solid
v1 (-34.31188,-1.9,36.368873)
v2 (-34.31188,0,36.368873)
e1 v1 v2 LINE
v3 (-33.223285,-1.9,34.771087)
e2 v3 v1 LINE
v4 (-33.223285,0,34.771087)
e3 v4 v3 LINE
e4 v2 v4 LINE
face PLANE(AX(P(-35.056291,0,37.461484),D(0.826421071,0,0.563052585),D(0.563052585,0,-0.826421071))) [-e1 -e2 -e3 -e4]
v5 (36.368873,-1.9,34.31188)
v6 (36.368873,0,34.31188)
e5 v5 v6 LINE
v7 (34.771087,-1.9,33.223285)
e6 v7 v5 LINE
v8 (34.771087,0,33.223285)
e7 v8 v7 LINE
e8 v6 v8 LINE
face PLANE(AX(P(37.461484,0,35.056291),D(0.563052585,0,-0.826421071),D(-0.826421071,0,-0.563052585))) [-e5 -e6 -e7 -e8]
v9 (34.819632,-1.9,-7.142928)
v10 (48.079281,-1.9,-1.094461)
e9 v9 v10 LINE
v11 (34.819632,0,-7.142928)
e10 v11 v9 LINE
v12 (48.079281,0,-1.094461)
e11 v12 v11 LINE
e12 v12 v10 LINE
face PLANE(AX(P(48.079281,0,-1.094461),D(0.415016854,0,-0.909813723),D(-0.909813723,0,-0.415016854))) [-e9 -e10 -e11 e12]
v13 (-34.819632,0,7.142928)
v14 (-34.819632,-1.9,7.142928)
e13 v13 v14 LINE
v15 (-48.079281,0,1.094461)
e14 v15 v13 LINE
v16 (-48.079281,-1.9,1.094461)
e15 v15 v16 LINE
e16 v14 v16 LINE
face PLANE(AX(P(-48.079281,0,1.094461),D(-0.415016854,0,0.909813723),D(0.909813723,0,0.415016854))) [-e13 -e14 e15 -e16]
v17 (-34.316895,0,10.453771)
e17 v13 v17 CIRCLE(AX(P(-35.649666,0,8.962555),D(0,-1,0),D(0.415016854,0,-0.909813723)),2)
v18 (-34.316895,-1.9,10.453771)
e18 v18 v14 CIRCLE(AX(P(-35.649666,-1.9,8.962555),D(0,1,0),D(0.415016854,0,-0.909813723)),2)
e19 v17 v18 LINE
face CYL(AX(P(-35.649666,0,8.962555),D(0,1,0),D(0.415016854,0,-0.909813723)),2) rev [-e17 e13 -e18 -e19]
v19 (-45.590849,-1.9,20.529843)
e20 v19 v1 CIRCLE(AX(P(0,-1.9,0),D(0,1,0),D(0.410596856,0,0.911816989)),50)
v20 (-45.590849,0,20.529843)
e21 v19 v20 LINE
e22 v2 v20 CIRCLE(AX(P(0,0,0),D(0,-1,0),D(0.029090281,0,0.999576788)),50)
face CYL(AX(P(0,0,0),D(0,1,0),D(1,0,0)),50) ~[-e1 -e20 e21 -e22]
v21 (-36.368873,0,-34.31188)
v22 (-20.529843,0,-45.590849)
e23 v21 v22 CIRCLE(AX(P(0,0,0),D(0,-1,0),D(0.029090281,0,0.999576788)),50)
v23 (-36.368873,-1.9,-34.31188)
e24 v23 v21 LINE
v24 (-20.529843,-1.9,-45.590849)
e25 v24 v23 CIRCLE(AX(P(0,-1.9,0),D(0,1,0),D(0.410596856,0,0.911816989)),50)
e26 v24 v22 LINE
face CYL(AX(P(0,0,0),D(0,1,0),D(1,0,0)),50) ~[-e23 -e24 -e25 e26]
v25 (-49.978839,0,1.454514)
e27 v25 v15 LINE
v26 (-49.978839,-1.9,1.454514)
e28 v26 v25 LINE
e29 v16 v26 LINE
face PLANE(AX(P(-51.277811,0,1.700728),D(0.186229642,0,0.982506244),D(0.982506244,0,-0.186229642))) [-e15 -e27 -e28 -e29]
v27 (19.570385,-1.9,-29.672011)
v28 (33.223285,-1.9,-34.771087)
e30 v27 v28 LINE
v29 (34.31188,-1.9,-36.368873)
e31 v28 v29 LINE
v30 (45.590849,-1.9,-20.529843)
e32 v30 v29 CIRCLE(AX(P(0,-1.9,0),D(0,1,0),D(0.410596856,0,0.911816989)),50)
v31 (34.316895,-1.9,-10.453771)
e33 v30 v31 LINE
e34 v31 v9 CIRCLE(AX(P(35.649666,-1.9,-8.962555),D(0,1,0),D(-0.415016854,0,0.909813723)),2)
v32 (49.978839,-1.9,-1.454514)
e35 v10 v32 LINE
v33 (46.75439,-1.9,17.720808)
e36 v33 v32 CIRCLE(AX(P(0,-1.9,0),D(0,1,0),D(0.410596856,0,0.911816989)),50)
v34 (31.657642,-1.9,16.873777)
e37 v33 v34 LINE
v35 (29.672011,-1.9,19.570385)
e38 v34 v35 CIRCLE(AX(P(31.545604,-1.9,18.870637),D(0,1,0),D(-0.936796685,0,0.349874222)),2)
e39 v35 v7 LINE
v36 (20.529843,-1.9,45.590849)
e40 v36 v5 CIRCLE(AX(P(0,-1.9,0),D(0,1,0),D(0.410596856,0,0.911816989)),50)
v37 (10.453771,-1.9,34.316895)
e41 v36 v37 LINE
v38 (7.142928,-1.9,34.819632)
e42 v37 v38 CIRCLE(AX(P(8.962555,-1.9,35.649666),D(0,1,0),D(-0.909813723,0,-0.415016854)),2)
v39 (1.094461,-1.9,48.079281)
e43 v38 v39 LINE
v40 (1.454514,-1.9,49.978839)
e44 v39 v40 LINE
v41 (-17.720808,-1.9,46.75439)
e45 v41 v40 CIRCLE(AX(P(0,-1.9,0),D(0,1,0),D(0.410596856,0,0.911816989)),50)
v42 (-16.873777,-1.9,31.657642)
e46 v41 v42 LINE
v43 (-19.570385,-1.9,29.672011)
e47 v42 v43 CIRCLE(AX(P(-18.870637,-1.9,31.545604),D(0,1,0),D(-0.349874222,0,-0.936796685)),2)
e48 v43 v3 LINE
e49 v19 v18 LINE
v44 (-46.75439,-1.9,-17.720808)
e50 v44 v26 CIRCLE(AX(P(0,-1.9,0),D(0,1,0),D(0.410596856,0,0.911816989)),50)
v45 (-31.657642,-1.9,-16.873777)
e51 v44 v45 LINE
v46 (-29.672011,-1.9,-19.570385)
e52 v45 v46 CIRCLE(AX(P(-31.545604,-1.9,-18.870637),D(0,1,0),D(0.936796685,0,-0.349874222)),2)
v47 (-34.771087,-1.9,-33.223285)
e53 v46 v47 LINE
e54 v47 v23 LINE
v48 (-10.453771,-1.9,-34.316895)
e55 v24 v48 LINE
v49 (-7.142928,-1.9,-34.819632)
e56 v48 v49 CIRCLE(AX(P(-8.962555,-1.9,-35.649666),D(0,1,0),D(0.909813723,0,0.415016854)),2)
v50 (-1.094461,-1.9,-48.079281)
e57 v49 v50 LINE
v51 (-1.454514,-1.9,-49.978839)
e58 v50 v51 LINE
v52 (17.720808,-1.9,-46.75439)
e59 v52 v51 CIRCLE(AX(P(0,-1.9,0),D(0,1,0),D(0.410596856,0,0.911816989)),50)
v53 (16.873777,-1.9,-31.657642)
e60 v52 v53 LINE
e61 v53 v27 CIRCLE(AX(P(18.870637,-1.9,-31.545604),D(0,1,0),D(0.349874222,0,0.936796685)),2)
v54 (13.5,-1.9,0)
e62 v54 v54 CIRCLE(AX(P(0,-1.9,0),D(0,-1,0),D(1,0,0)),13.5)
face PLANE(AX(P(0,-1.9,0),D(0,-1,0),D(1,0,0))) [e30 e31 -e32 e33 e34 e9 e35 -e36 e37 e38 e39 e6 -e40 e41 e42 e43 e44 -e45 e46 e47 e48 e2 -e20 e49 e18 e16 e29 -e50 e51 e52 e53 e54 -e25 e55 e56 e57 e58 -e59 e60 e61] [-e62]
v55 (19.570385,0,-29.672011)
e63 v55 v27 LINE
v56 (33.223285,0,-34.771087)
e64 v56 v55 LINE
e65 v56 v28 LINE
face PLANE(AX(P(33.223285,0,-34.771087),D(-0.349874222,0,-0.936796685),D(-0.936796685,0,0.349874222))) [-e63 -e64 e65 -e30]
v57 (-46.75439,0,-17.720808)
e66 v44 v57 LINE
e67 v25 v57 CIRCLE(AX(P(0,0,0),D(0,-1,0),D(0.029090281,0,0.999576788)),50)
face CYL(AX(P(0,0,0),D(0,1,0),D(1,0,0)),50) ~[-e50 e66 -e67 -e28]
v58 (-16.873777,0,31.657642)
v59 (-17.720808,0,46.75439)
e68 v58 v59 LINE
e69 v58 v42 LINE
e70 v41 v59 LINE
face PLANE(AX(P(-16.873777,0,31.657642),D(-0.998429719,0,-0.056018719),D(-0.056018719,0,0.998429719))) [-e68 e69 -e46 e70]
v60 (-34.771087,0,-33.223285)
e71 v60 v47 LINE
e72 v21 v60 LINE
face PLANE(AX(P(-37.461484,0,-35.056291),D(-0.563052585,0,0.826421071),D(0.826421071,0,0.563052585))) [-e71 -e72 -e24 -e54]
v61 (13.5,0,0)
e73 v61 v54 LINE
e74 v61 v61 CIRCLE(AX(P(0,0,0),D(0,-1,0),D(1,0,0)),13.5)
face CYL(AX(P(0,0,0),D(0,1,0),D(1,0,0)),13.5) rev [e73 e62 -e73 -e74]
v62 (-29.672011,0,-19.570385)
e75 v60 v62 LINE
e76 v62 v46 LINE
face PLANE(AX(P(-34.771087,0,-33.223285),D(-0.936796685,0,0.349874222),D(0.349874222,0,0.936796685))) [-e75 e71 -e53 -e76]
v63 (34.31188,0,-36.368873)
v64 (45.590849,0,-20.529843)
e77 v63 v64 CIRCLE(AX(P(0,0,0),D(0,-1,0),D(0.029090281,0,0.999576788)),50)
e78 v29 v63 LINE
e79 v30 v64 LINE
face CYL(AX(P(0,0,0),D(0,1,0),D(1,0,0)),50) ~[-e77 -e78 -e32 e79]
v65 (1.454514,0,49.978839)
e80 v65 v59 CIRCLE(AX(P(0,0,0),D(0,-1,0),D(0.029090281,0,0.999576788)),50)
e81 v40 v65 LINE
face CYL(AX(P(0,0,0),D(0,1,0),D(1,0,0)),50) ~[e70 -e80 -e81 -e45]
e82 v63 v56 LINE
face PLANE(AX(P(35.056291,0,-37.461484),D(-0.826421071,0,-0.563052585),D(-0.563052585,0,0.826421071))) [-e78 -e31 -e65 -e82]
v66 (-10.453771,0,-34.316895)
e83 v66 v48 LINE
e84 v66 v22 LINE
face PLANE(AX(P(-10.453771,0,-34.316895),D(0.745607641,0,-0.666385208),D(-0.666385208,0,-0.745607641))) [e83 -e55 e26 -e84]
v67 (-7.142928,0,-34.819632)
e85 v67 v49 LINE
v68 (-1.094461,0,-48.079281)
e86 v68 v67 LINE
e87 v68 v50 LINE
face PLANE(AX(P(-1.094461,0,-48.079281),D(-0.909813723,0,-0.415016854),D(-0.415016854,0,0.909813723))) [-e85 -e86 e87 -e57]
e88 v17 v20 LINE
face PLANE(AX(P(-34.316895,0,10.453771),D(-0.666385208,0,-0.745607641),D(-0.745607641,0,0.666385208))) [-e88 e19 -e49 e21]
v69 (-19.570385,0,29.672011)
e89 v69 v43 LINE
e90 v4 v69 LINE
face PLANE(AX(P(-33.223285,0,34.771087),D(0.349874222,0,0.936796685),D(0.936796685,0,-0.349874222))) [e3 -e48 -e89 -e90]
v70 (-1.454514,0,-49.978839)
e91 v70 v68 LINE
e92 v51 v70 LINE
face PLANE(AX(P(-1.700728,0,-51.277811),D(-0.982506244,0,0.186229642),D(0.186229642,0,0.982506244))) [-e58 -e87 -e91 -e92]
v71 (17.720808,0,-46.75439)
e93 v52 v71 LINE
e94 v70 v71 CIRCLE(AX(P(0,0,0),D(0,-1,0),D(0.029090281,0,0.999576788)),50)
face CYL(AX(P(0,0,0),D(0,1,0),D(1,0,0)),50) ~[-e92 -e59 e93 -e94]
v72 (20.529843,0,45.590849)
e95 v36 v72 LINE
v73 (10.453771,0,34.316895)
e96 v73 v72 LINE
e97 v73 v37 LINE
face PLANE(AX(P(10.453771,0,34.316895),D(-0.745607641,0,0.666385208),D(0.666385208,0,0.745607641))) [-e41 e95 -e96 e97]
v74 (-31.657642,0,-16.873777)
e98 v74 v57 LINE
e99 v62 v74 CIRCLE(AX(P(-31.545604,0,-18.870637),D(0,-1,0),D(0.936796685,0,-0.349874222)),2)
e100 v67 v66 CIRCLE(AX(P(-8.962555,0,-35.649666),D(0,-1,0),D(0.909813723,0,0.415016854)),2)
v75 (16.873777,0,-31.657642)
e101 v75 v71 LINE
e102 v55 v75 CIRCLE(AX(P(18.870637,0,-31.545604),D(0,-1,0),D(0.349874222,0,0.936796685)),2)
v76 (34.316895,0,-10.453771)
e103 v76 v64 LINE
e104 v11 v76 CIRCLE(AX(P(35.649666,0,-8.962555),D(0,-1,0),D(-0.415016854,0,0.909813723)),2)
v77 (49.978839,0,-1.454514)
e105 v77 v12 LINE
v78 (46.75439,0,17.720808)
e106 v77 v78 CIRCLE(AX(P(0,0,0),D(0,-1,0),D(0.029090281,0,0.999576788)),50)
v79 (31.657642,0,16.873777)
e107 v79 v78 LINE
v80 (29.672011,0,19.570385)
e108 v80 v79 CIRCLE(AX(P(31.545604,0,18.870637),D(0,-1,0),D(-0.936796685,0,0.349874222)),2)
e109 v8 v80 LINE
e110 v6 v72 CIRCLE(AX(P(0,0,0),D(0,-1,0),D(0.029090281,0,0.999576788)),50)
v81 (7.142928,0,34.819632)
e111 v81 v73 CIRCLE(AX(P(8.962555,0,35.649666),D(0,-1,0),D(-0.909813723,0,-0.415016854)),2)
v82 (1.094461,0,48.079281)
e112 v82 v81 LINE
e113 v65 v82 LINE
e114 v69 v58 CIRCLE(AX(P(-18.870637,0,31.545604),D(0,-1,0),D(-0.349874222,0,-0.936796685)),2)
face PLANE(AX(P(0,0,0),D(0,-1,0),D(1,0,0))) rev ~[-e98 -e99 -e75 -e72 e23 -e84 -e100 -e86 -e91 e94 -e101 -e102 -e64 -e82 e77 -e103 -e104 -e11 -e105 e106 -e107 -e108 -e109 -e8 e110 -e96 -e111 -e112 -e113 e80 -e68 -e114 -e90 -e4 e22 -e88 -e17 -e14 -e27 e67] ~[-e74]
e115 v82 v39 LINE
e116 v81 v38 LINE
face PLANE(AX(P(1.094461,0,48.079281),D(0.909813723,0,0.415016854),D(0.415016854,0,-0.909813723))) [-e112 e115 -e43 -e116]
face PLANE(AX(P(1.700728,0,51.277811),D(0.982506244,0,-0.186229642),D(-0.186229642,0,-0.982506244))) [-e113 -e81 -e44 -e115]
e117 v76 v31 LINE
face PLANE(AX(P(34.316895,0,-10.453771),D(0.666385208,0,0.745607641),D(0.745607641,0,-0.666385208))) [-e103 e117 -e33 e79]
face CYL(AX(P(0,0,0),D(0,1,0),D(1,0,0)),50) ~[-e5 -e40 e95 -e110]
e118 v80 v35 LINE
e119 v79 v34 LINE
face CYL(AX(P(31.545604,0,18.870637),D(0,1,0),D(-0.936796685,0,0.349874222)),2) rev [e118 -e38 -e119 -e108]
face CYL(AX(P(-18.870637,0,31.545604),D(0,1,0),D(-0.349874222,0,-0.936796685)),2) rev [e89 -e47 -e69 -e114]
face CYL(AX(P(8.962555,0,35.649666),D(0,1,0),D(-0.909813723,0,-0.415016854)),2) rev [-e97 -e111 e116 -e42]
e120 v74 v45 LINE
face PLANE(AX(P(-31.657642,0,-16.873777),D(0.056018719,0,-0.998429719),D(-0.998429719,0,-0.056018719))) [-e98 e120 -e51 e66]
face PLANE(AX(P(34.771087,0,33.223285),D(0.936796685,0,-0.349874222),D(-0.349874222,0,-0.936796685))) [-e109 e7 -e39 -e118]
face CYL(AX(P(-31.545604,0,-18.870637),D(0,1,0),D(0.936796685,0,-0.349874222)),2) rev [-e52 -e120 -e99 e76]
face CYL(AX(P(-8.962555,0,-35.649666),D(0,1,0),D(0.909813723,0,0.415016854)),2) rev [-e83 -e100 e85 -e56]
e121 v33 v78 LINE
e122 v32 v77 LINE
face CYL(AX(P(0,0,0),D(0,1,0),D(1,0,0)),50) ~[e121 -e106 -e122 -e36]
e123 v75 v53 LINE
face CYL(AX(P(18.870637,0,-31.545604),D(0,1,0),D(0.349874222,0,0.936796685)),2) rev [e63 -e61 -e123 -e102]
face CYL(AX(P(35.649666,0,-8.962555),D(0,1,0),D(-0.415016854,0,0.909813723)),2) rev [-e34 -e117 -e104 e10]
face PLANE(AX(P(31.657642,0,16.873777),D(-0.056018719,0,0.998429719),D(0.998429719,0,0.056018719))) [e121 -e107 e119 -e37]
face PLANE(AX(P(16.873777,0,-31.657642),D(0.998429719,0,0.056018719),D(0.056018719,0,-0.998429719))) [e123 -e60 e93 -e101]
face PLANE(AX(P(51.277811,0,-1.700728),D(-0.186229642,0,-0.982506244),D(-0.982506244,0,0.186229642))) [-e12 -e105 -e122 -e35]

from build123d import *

# Parameters (mm, degrees)
F0_R            = 50
F0_R_2          = 13.5
F1_DEPTH        = 1.9
F3_DEPTH        = 25
F5_DEPTH        = 25
F5_COPIES_COUNT = 8


# Not quite as in the source:
# - a pattern or mirror of a feature is missing from the dataset's text; its kind, count and spacing are read off the source's solid


with BuildPart() as f1:
    # F0 (on Front) → F1 (new body)
    with BuildSketch(Plane.XZ):
        Circle(F0_R)
        Circle(F0_R_2, mode=Mode.SUBTRACT)
    extrude(amount=F1_DEPTH)

    # F2 (on Front) → F3 (cut)
    with BuildSketch(Plane.XZ):
        with BuildLine():
            Line((12.4794095755, 60.955286026), (0, 50.1961745322))
            Line((0, 50.1961745322), (2.7271706326, 35.8238514012))
            ThreePointArc((2.7271706326, 35.8238514012), (3.9364062163, 34.3449689954), (5.8350966322, 34.555488762))
            Line((5.8350966322, 34.555488762), (21.0234094411, 45.1330654323))
            Line((21.0234094411, 45.1330654323), (12.4794095755, 60.955286026))
        make_face()
    extrude(amount=-F3_DEPTH, mode=Mode.SUBTRACT)

    # F4 (on Front) → F5 (cut)
    with BuildSketch(Plane.XZ):
        with BuildLine():
            Line((10.4537707273, 34.3168952742), (22.7111335844, 48.0314604938))
            Line((22.7111335844, 48.0314604938), (18.2506803442, 59.0550513337))
            Line((18.2506803442, 59.0550513337), (1.7007282507, 51.2778109993))
            Line((1.7007282507, 51.2778109993), (1.0944613384, 48.079281378))
            Line((1.0944613384, 48.079281378), (7.1429279991, 34.8196319836))
            ThreePointArc((7.1429279991, 34.8196319836), (8.6623060706, 33.6723315481), (10.4537707273, 34.3168952742))
        make_face()
    f5 = extrude(amount=F5_DEPTH, mode=Mode.SUBTRACT)

    # F5_copies: F5 ×8 about axis
    f5_copies_axis = Axis((0, 0, 0), (0, 1, 0))
    for i in range(1, F5_COPIES_COUNT):
        add(f5.rotate(f5_copies_axis, i * 360 / F5_COPIES_COUNT), mode=Mode.SUBTRACT)


solid = f1.part
